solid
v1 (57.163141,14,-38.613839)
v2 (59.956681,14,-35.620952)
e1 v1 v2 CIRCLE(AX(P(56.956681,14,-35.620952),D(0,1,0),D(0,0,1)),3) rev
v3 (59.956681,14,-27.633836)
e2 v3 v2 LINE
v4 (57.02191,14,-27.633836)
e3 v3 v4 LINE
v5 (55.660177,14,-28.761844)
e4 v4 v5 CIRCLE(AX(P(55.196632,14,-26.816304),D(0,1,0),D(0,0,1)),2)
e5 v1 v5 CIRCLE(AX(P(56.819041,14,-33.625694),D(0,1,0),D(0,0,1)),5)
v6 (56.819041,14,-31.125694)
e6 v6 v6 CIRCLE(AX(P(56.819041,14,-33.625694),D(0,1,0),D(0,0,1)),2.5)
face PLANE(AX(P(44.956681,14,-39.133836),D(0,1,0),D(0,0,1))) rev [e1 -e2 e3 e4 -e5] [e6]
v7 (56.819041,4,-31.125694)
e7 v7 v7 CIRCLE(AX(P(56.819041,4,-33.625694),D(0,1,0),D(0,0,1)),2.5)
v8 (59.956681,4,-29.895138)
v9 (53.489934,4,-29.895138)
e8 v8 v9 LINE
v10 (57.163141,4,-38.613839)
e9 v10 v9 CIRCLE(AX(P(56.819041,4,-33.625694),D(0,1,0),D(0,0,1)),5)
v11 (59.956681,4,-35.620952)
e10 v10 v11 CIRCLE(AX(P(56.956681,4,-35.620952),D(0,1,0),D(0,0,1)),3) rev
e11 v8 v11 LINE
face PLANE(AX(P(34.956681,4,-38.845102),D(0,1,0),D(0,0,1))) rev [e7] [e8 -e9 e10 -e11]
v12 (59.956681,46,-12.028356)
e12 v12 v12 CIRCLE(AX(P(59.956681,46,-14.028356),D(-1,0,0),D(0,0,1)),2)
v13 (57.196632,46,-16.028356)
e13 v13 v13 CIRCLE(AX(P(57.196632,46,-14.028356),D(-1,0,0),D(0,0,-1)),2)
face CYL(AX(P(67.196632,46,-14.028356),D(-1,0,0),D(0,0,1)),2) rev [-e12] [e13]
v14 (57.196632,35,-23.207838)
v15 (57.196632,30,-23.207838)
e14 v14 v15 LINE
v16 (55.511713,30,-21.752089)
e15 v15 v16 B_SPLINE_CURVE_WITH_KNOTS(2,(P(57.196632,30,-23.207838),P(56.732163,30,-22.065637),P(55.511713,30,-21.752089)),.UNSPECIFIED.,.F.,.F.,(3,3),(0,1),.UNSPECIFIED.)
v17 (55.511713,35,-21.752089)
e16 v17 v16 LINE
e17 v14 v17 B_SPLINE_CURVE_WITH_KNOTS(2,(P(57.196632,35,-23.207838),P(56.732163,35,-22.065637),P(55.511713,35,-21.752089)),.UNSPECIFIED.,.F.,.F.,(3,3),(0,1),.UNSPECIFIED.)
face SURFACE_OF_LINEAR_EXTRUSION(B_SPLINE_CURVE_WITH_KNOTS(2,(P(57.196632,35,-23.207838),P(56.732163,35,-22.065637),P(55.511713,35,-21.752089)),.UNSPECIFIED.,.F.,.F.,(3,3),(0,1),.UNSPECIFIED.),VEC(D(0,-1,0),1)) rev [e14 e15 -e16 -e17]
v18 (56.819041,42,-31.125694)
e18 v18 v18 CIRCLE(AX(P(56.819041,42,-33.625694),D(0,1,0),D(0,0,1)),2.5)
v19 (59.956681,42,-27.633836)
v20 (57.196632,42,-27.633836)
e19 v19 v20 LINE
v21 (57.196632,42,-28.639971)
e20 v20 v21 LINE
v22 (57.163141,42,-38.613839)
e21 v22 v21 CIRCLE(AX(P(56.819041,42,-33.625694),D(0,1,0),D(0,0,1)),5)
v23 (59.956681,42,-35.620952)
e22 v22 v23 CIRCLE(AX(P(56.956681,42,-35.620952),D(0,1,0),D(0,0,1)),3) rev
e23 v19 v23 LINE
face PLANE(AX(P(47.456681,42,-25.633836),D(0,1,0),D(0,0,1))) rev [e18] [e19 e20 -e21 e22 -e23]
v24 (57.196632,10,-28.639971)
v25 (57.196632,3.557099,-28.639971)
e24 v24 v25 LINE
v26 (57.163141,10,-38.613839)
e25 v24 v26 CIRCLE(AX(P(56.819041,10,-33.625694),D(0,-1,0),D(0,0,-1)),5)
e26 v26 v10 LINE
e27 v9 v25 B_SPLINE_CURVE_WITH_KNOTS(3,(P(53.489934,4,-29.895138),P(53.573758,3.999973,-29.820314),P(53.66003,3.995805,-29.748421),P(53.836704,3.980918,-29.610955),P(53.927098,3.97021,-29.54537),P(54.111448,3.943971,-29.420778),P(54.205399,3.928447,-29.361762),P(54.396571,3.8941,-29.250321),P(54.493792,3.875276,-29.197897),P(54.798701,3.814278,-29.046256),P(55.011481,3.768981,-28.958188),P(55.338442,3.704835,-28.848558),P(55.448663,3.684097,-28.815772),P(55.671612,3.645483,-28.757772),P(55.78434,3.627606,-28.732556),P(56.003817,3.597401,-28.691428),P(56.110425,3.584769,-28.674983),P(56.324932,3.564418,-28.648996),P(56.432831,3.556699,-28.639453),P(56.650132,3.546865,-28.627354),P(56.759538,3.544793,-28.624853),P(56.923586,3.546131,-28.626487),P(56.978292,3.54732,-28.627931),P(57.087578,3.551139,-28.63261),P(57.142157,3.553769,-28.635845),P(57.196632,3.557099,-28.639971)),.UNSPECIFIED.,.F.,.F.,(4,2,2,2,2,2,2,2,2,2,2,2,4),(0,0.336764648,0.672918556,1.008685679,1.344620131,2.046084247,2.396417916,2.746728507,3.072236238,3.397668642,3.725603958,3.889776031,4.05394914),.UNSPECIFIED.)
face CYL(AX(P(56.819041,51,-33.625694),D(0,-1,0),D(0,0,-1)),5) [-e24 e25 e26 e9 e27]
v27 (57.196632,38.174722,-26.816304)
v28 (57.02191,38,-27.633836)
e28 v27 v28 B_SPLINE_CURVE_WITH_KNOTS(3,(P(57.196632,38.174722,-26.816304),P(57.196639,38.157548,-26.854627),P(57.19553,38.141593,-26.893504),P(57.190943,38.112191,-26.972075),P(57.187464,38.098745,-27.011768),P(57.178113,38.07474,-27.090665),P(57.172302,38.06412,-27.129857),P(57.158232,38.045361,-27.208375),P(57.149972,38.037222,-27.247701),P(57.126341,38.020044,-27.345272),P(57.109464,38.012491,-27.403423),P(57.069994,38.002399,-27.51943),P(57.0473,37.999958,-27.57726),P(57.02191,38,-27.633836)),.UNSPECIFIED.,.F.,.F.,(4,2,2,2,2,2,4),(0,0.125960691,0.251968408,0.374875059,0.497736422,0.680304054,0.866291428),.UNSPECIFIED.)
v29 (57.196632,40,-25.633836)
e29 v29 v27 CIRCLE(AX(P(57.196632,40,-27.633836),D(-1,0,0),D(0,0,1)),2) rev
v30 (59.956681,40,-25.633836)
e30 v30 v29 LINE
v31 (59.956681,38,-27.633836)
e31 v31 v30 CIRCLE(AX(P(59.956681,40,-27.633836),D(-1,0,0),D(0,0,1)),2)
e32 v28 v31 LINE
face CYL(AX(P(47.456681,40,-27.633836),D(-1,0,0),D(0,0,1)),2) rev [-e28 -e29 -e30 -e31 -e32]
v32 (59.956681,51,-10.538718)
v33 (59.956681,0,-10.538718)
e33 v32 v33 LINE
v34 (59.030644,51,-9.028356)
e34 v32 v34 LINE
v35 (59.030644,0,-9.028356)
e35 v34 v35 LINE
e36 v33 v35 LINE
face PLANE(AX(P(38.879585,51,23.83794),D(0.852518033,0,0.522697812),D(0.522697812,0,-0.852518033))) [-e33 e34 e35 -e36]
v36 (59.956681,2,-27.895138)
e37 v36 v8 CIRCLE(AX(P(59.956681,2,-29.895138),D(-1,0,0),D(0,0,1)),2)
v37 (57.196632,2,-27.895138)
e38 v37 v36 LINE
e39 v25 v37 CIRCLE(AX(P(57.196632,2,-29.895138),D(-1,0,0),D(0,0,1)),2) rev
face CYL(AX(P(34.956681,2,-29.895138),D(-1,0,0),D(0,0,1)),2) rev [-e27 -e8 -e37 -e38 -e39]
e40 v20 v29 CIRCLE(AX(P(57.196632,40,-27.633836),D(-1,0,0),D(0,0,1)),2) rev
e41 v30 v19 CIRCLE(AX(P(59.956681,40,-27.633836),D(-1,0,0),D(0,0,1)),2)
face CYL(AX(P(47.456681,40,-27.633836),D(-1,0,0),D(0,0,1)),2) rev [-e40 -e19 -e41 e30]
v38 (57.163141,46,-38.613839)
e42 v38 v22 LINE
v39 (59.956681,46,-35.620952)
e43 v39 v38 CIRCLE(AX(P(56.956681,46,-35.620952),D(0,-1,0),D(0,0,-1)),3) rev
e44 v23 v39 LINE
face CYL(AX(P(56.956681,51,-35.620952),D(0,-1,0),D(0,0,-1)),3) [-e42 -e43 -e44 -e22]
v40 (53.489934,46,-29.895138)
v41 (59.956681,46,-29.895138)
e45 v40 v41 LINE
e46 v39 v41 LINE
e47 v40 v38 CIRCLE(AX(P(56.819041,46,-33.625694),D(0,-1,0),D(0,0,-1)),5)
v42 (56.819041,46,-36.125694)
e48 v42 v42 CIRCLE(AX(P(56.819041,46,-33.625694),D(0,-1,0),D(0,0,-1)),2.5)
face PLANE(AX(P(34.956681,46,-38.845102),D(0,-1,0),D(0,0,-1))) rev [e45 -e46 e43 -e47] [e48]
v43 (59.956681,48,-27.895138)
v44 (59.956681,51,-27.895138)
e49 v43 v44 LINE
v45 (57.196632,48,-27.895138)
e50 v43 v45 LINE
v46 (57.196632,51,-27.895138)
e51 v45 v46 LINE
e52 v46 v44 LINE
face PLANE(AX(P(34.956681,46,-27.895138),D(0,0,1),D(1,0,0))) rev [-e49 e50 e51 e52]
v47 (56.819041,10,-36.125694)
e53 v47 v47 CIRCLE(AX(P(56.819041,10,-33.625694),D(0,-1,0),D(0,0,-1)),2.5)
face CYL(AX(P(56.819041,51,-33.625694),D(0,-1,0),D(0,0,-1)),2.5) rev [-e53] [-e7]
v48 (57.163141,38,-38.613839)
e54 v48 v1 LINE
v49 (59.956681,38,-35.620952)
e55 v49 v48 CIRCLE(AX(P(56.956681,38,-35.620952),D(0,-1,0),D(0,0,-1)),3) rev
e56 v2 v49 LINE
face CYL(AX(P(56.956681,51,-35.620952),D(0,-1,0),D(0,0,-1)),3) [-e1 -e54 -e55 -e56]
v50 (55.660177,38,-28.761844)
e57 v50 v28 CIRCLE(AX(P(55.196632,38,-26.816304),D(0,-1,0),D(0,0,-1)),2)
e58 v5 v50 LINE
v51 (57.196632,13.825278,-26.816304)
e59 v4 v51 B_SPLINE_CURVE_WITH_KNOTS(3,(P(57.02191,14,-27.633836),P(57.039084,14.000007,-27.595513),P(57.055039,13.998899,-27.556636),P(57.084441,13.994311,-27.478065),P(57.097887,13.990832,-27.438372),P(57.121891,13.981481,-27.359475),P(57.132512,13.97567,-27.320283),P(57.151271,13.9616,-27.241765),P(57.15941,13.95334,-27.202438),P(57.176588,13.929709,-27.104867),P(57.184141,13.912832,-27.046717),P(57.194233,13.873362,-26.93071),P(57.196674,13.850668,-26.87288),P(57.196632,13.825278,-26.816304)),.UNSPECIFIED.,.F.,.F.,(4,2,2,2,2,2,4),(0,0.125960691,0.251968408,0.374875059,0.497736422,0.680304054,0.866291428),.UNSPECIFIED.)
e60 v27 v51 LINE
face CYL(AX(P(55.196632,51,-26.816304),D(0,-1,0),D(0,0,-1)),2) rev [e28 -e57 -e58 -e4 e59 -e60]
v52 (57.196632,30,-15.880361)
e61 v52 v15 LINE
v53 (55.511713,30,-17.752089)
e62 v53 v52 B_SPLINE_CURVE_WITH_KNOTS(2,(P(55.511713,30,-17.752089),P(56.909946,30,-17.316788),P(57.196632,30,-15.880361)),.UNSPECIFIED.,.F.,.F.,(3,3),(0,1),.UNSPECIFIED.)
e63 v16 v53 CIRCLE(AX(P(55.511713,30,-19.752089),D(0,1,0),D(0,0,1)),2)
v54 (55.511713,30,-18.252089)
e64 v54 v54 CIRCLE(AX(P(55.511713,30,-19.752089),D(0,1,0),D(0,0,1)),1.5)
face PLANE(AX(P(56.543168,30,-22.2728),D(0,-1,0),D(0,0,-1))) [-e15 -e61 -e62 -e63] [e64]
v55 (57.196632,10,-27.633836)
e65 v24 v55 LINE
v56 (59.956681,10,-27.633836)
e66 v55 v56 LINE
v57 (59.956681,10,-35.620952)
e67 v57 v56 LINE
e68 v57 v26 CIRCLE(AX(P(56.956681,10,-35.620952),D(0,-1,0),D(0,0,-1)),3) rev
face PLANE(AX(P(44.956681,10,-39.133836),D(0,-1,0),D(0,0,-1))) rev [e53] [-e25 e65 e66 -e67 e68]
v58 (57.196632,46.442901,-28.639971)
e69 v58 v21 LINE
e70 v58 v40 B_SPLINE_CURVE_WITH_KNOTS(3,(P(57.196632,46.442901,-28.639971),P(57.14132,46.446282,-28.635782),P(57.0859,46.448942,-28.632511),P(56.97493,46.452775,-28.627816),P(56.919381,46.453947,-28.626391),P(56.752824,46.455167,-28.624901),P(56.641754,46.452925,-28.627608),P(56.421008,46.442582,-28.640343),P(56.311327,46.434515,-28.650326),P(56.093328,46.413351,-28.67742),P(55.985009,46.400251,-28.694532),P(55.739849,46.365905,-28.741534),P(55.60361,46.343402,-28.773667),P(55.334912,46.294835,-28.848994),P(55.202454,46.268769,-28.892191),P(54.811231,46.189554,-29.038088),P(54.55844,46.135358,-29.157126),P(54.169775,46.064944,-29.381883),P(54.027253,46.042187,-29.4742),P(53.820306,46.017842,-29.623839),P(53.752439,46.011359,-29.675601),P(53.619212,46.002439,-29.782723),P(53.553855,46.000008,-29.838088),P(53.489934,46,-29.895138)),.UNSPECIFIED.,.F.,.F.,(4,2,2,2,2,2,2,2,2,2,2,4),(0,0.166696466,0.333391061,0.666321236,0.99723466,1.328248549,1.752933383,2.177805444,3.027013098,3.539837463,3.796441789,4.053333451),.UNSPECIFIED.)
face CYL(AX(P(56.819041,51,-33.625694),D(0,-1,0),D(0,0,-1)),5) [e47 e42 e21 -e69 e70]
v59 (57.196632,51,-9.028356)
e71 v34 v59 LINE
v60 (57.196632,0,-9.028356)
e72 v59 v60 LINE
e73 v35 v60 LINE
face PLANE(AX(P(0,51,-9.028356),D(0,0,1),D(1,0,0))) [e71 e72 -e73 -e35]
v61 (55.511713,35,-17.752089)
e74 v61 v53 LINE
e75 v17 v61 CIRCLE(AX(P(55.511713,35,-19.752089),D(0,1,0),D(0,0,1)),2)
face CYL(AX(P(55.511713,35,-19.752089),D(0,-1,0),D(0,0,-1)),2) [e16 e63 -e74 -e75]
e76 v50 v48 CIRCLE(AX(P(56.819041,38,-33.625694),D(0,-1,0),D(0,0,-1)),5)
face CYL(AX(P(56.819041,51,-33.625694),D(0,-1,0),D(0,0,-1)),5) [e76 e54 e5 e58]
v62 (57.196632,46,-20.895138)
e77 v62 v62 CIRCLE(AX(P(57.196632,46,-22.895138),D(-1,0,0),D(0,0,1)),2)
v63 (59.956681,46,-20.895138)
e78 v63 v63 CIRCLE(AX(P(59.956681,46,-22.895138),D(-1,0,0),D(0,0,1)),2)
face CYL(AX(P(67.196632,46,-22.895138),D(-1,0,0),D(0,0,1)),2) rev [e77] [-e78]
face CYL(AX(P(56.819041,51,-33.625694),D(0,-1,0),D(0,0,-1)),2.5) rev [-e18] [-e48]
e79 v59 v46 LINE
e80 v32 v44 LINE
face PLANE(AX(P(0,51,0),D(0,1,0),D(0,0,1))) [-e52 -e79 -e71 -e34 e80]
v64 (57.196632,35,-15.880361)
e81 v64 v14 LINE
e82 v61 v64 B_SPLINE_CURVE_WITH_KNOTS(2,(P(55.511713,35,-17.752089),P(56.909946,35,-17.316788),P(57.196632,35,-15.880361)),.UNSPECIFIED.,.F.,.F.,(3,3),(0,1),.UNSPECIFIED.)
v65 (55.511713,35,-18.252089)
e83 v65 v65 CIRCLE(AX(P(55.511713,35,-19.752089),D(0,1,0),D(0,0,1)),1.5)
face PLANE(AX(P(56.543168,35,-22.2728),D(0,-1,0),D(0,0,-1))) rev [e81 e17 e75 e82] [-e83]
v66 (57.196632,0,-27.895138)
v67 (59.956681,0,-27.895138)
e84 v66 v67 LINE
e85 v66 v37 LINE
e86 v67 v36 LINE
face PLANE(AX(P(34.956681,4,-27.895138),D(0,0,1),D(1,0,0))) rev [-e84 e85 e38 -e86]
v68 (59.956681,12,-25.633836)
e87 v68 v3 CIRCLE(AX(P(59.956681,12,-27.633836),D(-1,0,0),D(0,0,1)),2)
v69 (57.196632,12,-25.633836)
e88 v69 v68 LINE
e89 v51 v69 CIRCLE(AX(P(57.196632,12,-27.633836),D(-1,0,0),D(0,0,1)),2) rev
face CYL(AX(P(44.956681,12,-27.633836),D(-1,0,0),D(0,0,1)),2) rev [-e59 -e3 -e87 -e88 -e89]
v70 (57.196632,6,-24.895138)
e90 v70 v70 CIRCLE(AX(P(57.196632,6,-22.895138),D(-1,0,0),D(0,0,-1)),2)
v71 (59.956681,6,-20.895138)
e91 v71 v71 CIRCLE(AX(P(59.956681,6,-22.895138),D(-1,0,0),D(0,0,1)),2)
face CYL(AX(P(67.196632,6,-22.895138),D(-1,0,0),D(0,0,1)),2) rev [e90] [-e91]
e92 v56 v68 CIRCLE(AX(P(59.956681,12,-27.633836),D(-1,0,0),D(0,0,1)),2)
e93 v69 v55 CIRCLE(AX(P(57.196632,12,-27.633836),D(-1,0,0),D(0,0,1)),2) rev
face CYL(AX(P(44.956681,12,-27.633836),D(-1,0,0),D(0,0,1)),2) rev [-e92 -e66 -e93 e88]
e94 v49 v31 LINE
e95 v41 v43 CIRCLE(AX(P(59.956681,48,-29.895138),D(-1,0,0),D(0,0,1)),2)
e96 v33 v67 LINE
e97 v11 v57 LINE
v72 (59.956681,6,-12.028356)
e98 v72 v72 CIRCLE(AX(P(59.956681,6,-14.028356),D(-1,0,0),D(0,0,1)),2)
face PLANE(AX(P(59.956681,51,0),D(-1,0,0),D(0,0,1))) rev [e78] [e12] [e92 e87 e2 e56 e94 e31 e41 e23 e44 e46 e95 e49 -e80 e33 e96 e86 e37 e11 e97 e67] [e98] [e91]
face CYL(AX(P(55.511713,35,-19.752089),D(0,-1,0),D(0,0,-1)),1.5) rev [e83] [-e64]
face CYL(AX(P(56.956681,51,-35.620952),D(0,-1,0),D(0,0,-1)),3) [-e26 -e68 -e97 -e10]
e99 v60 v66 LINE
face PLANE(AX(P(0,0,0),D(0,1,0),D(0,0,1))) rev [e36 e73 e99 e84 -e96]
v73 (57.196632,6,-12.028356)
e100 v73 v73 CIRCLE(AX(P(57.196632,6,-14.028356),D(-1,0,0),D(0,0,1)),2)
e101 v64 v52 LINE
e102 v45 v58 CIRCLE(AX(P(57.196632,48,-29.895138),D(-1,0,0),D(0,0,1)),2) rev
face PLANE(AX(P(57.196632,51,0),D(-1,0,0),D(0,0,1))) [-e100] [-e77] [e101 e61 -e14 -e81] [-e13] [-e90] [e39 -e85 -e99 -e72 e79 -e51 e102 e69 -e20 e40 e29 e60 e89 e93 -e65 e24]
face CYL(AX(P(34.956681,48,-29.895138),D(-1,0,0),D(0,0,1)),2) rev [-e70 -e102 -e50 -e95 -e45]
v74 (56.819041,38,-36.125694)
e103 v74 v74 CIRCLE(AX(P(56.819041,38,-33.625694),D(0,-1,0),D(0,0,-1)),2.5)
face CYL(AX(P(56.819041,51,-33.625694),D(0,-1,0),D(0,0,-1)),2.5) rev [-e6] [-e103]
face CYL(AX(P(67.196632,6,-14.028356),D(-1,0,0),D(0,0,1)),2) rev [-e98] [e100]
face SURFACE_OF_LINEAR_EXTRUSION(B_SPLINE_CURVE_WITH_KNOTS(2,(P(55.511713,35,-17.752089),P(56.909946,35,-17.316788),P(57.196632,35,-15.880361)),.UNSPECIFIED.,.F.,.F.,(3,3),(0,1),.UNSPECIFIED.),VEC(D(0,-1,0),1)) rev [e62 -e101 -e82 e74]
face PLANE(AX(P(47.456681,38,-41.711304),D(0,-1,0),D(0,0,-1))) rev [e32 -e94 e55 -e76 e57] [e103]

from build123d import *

# Parameters (mm, degrees)
SKETCH1_R           = 2.5
BOSS_EXTRUDE1_DEPTH = 51
CUT_EXTRUDE1_DEPTH  = 15
CUT_EXTRUDE2_DEPTH  = 12.5
SKETCH4_W           = 10.949964099
SKETCH4_H           = 4
CUT_EXTRUDE3_DEPTH  = 25
SKETCH5_R           = 2
CUT_EXTRUDE4_DEPTH  = 10
FILLET4_R           = 2
FILLET5_R           = 3
FILLET6_START       = 57.196631886
FILLET6_DEPTH       = 2.760049196
FILLET6_START_2     = 53.489934113
FILLET6_2_DEPTH     = 3.979721459
FILLET6_START_3     = 57.021910195
FILLET6_3_DEPTH     = 0.447745377
FILLET6_START_4     = 1
FILLET6_4_DEPTH     = 48
FILLET6_START_5     = 46
FILLET6_5_DEPTH     = 2
FILLET6_START_6     = 2
FILLET6_6_DEPTH     = 2
SKETCH6_R           = 1.5
BOSS_EXTRUDE2_DEPTH = 5


with BuildPart() as part:
    # Sketch1 → Boss-Extrude1 (new body)
    with BuildSketch(Plane(origin=(0, 0, 0), x_dir=(1, 0, 0), z_dir=(0, 1, 0))):
        with BuildLine():
            Line((57.196631886, 9.028355512), (57.196631886, 28.639971463))
            ThreePointArc((57.196631886, 28.639971463), (52.044420209, 35.109942461), (59.956681082, 37.518663649))
            Line((59.956681082, 37.518663649), (59.956681082, 29.732723556))
            Line((59.956681082, 29.732723556), (59.956681082, 10.538718377))
            Line((59.956681082, 10.538718377), (59.030643937, 9.028355512))
            Line((59.030643937, 9.028355512), (57.196631886, 9.028355512))
        make_face()
        with Locations(Location((56.81904117, 33.625693603, 0), (0, 0, 270))):
            Circle(SKETCH1_R, mode=Mode.SUBTRACT)
    extrude(amount=BOSS_EXTRUDE1_DEPTH)

    # Sketch2 → Cut-Extrude1 (cut, symmetric)
    with BuildSketch(Plane(origin=(59.956681082, 0, 0), x_dir=(0, 0, -1), z_dir=(1, 0, 0))):
        Polygon((39.133835998, 10), (25.633835998, 10), (25.633835998, 14), (27.895137764, 14), (39.133835998, 14), align=None)
    extrude(amount=CUT_EXTRUDE1_DEPTH, both=True, mode=Mode.SUBTRACT)

    # Sketch3 → Cut-Extrude2 (cut, symmetric)
    with BuildSketch(Plane(origin=(59.956681082, 0, 0), x_dir=(0, 0, -1), z_dir=(1, 0, 0))):
        Polygon((41.711304396, 42), (27.895137764, 42), (25.633835998, 42), (25.633835998, 38), (41.711304396, 38), align=None)
    extrude(amount=CUT_EXTRUDE2_DEPTH, both=True, mode=Mode.SUBTRACT)

    # Sketch4 → Cut-Extrude3 (cut, symmetric)
    with BuildSketch(Plane(origin=(59.956681082, 0, 0), x_dir=(0, 0, -1), z_dir=(1, 0, 0))):
        with Locations((33.370119814, 2)):
            Rectangle(SKETCH4_W, SKETCH4_H)
        Polygon((38.845101863, 51), (30.056521444, 51), (27.895137764, 51), (27.895137764, 47), (27.895137764, 46), (38.845101863, 46), align=None)
    extrude(amount=CUT_EXTRUDE3_DEPTH, both=True, mode=Mode.SUBTRACT)

    # Sketch5 → Cut-Extrude4 (cut)
    with BuildSketch(Plane.ZY.offset(-57.196631886)):
        with Locations((-22.895137764, 46)):
            Circle(SKETCH5_R)
        with Locations((-14.028355512, 46)):
            Circle(SKETCH5_R)
        with Locations((-14.028355512, 6)):
            Circle(SKETCH5_R)
        with Locations((-22.895137764, 6)):
            Circle(SKETCH5_R)
    extrude(amount=-CUT_EXTRUDE4_DEPTH, mode=Mode.SUBTRACT)

    # Fillet4
    fillet4_edges = [part.edges().sort_by_distance(p)[0] for p in [
        (57.196631886, 26, -28.639971463),
    ]]
    fillet(fillet4_edges, radius=FILLET4_R)

    # Fillet5
    fillet5_edges = [part.edges().sort_by_distance(p)[0] for p in [
        (59.956681082, 7, -37.518663649),
        (59.956681082, 26, -37.518663649),
        (59.956681082, 44, -37.518663649),
    ]]
    fillet(fillet5_edges, radius=FILLET5_R)

    # Fillet6: read off the stored shape, not the designer's step
    # Fillet6 outline → Fillet6 (add)
    with BuildSketch(Plane.YZ.offset(FILLET6_START)):
        with BuildLine():
            Line((4, -27.895137764), (2, -27.895137764))
            ThreePointArc((2, -27.895137764), (3.414213563, -28.480924202), (4, -29.895137764))
            Line((4, -29.895137764), (4, -27.895137764))
        make_face()
        with BuildLine():
            Line((46, -27.895137764), (46, -29.895137764))
            ThreePointArc((46, -29.895137764), (46.585786437, -28.480924202), (48, -27.895137764))
            Line((48, -27.895137764), (46, -27.895137764))
        make_face()
        with BuildLine():
            Line((14, -25.633835998), (12, -25.633835998))
            ThreePointArc((12, -25.633835998), (13.414213562, -26.219622436), (14, -27.633835998))
            Line((14, -27.633835998), (14, -25.633835998))
        make_face()
        with BuildLine():
            ThreePointArc((10, -27.633835998), (10.585786438, -26.219622436), (12, -25.633835998))
            Line((12, -25.633835998), (10, -25.633835998))
            Line((10, -25.633835998), (10, -27.633835998))
        make_face()
        with BuildLine():
            Line((38, -25.633835998), (38, -27.633835998))
            ThreePointArc((38, -27.633835998), (38.585786438, -26.219622436), (40, -25.633835998))
            Line((40, -25.633835998), (38, -25.633835998))
        make_face()
        with BuildLine():
            Line((42, -25.633835998), (40, -25.633835998))
            ThreePointArc((40, -25.633835998), (41.414213562, -26.219622436), (42, -27.633835998))
            Line((42, -27.633835998), (42, -25.633835998))
        make_face()
    extrude(amount=FILLET6_DEPTH)

    # Fillet6 2 outline → Fillet6 2 (add)
    with BuildSketch(Plane.YZ.offset(FILLET6_START_2)):
        with BuildLine():
            Line((4, -27.895137764), (2, -27.895137764))
            ThreePointArc((2, -27.895137764), (3.414213563, -28.480924202), (4, -29.895137764))
            Line((4, -29.895137764), (4, -27.895137764))
        make_face()
        with BuildLine():
            Line((46, -27.895137764), (46, -29.895137764))
            ThreePointArc((46, -29.895137764), (46.585786437, -28.480924202), (48, -27.895137764))
            Line((48, -27.895137764), (46, -27.895137764))
        make_face()
    extrude(amount=FILLET6_2_DEPTH)

    # Fillet6 3 outline → Fillet6 3 (add)
    with BuildSketch(Plane.YZ.offset(FILLET6_START_3)):
        with BuildLine():
            Line((14, -25.633835998), (12, -25.633835998))
            ThreePointArc((12, -25.633835998), (13.414213562, -26.219622436), (14, -27.633835998))
            Line((14, -27.633835998), (14, -25.633835998))
        make_face()
        with BuildLine():
            Line((38, -25.633835998), (38, -27.633835998))
            ThreePointArc((38, -27.633835998), (38.585786438, -26.219622436), (40, -25.633835998))
            Line((40, -25.633835998), (38, -25.633835998))
        make_face()
    extrude(amount=FILLET6_3_DEPTH)

    # Fillet6 4 outline → Fillet6 4 (cut)
    with BuildSketch(Plane(origin=(0, 0, 0), x_dir=(1, 0, 0), z_dir=(0, 1, 0)).offset(FILLET6_START_4)):
        with BuildLine():
            ThreePointArc((56.880709526, 27.895137764), (56.354589633, 28.446988989), (55.660177396, 28.761843816))
            ThreePointArc((55.660177396, 28.761843816), (54.504616994, 29.193601463), (53.489934157, 29.895137813))
            Line((53.489934157, 29.895137813), (53.489934113, 27.895137764))
            Line((53.489934113, 27.895137764), (56.880709526, 27.895137764))
        make_face()
        with BuildLine():
            Line((57.196631886, 25.633835998), (57.196631886, 26.816303901))
            ThreePointArc((57.196631886, 26.816303901), (57.152463779, 27.234301039), (57.021910279, 27.633836035))
            Line((57.021910279, 27.633836035), (57.021910195, 25.633835998))
            Line((57.021910195, 25.633835998), (57.196631886, 25.633835998))
        make_face()
    extrude(amount=FILLET6_4_DEPTH, mode=Mode.SUBTRACT)

    # Fillet6 5 outline → Fillet6 5 (cut)
    with BuildSketch(Plane(origin=(0, 0, 0), x_dir=(1, 0, 0), z_dir=(0, 1, 0)).offset(FILLET6_START_5)):
        with BuildLine():
            Line((57.196631886, 27.895137764), (57.196631886, 28.639971463))
            ThreePointArc((57.196631886, 28.639971463), (56.423680429, 28.641349124), (55.660177396, 28.761843815))
            ThreePointArc((55.660177396, 28.761843815), (56.354589633, 28.446988989), (56.880709526, 27.895137764))
            Line((56.880709526, 27.895137764), (57.196631886, 27.895137764))
        make_face()
    extrude(amount=FILLET6_5_DEPTH, mode=Mode.SUBTRACT)

    # Fillet6 6 outline → Fillet6 6 (cut)
    with BuildSketch(Plane(origin=(0, 0, 0), x_dir=(1, 0, 0), z_dir=(0, 1, 0)).offset(FILLET6_START_6)):
        with BuildLine():
            Line((57.196631886, 27.895137764), (57.196631886, 28.639971463))
            ThreePointArc((57.196631886, 28.639971463), (56.423680429, 28.641349124), (55.660177396, 28.761843815))
            ThreePointArc((55.660177396, 28.761843815), (56.354589633, 28.446988989), (56.880709526, 27.895137764))
            Line((56.880709526, 27.895137764), (57.196631886, 27.895137764))
        make_face()
    extrude(amount=FILLET6_6_DEPTH, mode=Mode.SUBTRACT)

    # Sketch6 → Boss-Extrude2 (add)
    with BuildSketch(Plane(origin=(0, 30, 0), x_dir=(1, 0, 0), z_dir=(0, 1, 0))):
        with BuildLine():
            Line((57.196631886, 23.207838196), (57.196631886, 15.88036097))
            add(Edge.make_bspline(
                [(55.511713205, 17.752088745), (56.909946197, 17.31678815), (57.196631886, 15.88036097)],
                knots=[0, 0, 0, 1, 1, 1], degree=2))
            ThreePointArc((55.511713205, 17.752088745), (53.511713205, 19.752088745), (55.511713205, 21.752088745))
            add(Edge.make_bspline(
                [(55.511713205, 21.752088745), (56.732163203, 22.065636669), (57.196631886, 23.207838196)],
                knots=[0, 0, 0, 1, 1, 1], degree=2))
        make_face()
        with Locations(Location((55.511713205, 19.752088745, 0), (0, 0, 270))):
            Circle(SKETCH6_R, mode=Mode.SUBTRACT)
    extrude(amount=BOSS_EXTRUDE2_DEPTH)


solid = part.part
